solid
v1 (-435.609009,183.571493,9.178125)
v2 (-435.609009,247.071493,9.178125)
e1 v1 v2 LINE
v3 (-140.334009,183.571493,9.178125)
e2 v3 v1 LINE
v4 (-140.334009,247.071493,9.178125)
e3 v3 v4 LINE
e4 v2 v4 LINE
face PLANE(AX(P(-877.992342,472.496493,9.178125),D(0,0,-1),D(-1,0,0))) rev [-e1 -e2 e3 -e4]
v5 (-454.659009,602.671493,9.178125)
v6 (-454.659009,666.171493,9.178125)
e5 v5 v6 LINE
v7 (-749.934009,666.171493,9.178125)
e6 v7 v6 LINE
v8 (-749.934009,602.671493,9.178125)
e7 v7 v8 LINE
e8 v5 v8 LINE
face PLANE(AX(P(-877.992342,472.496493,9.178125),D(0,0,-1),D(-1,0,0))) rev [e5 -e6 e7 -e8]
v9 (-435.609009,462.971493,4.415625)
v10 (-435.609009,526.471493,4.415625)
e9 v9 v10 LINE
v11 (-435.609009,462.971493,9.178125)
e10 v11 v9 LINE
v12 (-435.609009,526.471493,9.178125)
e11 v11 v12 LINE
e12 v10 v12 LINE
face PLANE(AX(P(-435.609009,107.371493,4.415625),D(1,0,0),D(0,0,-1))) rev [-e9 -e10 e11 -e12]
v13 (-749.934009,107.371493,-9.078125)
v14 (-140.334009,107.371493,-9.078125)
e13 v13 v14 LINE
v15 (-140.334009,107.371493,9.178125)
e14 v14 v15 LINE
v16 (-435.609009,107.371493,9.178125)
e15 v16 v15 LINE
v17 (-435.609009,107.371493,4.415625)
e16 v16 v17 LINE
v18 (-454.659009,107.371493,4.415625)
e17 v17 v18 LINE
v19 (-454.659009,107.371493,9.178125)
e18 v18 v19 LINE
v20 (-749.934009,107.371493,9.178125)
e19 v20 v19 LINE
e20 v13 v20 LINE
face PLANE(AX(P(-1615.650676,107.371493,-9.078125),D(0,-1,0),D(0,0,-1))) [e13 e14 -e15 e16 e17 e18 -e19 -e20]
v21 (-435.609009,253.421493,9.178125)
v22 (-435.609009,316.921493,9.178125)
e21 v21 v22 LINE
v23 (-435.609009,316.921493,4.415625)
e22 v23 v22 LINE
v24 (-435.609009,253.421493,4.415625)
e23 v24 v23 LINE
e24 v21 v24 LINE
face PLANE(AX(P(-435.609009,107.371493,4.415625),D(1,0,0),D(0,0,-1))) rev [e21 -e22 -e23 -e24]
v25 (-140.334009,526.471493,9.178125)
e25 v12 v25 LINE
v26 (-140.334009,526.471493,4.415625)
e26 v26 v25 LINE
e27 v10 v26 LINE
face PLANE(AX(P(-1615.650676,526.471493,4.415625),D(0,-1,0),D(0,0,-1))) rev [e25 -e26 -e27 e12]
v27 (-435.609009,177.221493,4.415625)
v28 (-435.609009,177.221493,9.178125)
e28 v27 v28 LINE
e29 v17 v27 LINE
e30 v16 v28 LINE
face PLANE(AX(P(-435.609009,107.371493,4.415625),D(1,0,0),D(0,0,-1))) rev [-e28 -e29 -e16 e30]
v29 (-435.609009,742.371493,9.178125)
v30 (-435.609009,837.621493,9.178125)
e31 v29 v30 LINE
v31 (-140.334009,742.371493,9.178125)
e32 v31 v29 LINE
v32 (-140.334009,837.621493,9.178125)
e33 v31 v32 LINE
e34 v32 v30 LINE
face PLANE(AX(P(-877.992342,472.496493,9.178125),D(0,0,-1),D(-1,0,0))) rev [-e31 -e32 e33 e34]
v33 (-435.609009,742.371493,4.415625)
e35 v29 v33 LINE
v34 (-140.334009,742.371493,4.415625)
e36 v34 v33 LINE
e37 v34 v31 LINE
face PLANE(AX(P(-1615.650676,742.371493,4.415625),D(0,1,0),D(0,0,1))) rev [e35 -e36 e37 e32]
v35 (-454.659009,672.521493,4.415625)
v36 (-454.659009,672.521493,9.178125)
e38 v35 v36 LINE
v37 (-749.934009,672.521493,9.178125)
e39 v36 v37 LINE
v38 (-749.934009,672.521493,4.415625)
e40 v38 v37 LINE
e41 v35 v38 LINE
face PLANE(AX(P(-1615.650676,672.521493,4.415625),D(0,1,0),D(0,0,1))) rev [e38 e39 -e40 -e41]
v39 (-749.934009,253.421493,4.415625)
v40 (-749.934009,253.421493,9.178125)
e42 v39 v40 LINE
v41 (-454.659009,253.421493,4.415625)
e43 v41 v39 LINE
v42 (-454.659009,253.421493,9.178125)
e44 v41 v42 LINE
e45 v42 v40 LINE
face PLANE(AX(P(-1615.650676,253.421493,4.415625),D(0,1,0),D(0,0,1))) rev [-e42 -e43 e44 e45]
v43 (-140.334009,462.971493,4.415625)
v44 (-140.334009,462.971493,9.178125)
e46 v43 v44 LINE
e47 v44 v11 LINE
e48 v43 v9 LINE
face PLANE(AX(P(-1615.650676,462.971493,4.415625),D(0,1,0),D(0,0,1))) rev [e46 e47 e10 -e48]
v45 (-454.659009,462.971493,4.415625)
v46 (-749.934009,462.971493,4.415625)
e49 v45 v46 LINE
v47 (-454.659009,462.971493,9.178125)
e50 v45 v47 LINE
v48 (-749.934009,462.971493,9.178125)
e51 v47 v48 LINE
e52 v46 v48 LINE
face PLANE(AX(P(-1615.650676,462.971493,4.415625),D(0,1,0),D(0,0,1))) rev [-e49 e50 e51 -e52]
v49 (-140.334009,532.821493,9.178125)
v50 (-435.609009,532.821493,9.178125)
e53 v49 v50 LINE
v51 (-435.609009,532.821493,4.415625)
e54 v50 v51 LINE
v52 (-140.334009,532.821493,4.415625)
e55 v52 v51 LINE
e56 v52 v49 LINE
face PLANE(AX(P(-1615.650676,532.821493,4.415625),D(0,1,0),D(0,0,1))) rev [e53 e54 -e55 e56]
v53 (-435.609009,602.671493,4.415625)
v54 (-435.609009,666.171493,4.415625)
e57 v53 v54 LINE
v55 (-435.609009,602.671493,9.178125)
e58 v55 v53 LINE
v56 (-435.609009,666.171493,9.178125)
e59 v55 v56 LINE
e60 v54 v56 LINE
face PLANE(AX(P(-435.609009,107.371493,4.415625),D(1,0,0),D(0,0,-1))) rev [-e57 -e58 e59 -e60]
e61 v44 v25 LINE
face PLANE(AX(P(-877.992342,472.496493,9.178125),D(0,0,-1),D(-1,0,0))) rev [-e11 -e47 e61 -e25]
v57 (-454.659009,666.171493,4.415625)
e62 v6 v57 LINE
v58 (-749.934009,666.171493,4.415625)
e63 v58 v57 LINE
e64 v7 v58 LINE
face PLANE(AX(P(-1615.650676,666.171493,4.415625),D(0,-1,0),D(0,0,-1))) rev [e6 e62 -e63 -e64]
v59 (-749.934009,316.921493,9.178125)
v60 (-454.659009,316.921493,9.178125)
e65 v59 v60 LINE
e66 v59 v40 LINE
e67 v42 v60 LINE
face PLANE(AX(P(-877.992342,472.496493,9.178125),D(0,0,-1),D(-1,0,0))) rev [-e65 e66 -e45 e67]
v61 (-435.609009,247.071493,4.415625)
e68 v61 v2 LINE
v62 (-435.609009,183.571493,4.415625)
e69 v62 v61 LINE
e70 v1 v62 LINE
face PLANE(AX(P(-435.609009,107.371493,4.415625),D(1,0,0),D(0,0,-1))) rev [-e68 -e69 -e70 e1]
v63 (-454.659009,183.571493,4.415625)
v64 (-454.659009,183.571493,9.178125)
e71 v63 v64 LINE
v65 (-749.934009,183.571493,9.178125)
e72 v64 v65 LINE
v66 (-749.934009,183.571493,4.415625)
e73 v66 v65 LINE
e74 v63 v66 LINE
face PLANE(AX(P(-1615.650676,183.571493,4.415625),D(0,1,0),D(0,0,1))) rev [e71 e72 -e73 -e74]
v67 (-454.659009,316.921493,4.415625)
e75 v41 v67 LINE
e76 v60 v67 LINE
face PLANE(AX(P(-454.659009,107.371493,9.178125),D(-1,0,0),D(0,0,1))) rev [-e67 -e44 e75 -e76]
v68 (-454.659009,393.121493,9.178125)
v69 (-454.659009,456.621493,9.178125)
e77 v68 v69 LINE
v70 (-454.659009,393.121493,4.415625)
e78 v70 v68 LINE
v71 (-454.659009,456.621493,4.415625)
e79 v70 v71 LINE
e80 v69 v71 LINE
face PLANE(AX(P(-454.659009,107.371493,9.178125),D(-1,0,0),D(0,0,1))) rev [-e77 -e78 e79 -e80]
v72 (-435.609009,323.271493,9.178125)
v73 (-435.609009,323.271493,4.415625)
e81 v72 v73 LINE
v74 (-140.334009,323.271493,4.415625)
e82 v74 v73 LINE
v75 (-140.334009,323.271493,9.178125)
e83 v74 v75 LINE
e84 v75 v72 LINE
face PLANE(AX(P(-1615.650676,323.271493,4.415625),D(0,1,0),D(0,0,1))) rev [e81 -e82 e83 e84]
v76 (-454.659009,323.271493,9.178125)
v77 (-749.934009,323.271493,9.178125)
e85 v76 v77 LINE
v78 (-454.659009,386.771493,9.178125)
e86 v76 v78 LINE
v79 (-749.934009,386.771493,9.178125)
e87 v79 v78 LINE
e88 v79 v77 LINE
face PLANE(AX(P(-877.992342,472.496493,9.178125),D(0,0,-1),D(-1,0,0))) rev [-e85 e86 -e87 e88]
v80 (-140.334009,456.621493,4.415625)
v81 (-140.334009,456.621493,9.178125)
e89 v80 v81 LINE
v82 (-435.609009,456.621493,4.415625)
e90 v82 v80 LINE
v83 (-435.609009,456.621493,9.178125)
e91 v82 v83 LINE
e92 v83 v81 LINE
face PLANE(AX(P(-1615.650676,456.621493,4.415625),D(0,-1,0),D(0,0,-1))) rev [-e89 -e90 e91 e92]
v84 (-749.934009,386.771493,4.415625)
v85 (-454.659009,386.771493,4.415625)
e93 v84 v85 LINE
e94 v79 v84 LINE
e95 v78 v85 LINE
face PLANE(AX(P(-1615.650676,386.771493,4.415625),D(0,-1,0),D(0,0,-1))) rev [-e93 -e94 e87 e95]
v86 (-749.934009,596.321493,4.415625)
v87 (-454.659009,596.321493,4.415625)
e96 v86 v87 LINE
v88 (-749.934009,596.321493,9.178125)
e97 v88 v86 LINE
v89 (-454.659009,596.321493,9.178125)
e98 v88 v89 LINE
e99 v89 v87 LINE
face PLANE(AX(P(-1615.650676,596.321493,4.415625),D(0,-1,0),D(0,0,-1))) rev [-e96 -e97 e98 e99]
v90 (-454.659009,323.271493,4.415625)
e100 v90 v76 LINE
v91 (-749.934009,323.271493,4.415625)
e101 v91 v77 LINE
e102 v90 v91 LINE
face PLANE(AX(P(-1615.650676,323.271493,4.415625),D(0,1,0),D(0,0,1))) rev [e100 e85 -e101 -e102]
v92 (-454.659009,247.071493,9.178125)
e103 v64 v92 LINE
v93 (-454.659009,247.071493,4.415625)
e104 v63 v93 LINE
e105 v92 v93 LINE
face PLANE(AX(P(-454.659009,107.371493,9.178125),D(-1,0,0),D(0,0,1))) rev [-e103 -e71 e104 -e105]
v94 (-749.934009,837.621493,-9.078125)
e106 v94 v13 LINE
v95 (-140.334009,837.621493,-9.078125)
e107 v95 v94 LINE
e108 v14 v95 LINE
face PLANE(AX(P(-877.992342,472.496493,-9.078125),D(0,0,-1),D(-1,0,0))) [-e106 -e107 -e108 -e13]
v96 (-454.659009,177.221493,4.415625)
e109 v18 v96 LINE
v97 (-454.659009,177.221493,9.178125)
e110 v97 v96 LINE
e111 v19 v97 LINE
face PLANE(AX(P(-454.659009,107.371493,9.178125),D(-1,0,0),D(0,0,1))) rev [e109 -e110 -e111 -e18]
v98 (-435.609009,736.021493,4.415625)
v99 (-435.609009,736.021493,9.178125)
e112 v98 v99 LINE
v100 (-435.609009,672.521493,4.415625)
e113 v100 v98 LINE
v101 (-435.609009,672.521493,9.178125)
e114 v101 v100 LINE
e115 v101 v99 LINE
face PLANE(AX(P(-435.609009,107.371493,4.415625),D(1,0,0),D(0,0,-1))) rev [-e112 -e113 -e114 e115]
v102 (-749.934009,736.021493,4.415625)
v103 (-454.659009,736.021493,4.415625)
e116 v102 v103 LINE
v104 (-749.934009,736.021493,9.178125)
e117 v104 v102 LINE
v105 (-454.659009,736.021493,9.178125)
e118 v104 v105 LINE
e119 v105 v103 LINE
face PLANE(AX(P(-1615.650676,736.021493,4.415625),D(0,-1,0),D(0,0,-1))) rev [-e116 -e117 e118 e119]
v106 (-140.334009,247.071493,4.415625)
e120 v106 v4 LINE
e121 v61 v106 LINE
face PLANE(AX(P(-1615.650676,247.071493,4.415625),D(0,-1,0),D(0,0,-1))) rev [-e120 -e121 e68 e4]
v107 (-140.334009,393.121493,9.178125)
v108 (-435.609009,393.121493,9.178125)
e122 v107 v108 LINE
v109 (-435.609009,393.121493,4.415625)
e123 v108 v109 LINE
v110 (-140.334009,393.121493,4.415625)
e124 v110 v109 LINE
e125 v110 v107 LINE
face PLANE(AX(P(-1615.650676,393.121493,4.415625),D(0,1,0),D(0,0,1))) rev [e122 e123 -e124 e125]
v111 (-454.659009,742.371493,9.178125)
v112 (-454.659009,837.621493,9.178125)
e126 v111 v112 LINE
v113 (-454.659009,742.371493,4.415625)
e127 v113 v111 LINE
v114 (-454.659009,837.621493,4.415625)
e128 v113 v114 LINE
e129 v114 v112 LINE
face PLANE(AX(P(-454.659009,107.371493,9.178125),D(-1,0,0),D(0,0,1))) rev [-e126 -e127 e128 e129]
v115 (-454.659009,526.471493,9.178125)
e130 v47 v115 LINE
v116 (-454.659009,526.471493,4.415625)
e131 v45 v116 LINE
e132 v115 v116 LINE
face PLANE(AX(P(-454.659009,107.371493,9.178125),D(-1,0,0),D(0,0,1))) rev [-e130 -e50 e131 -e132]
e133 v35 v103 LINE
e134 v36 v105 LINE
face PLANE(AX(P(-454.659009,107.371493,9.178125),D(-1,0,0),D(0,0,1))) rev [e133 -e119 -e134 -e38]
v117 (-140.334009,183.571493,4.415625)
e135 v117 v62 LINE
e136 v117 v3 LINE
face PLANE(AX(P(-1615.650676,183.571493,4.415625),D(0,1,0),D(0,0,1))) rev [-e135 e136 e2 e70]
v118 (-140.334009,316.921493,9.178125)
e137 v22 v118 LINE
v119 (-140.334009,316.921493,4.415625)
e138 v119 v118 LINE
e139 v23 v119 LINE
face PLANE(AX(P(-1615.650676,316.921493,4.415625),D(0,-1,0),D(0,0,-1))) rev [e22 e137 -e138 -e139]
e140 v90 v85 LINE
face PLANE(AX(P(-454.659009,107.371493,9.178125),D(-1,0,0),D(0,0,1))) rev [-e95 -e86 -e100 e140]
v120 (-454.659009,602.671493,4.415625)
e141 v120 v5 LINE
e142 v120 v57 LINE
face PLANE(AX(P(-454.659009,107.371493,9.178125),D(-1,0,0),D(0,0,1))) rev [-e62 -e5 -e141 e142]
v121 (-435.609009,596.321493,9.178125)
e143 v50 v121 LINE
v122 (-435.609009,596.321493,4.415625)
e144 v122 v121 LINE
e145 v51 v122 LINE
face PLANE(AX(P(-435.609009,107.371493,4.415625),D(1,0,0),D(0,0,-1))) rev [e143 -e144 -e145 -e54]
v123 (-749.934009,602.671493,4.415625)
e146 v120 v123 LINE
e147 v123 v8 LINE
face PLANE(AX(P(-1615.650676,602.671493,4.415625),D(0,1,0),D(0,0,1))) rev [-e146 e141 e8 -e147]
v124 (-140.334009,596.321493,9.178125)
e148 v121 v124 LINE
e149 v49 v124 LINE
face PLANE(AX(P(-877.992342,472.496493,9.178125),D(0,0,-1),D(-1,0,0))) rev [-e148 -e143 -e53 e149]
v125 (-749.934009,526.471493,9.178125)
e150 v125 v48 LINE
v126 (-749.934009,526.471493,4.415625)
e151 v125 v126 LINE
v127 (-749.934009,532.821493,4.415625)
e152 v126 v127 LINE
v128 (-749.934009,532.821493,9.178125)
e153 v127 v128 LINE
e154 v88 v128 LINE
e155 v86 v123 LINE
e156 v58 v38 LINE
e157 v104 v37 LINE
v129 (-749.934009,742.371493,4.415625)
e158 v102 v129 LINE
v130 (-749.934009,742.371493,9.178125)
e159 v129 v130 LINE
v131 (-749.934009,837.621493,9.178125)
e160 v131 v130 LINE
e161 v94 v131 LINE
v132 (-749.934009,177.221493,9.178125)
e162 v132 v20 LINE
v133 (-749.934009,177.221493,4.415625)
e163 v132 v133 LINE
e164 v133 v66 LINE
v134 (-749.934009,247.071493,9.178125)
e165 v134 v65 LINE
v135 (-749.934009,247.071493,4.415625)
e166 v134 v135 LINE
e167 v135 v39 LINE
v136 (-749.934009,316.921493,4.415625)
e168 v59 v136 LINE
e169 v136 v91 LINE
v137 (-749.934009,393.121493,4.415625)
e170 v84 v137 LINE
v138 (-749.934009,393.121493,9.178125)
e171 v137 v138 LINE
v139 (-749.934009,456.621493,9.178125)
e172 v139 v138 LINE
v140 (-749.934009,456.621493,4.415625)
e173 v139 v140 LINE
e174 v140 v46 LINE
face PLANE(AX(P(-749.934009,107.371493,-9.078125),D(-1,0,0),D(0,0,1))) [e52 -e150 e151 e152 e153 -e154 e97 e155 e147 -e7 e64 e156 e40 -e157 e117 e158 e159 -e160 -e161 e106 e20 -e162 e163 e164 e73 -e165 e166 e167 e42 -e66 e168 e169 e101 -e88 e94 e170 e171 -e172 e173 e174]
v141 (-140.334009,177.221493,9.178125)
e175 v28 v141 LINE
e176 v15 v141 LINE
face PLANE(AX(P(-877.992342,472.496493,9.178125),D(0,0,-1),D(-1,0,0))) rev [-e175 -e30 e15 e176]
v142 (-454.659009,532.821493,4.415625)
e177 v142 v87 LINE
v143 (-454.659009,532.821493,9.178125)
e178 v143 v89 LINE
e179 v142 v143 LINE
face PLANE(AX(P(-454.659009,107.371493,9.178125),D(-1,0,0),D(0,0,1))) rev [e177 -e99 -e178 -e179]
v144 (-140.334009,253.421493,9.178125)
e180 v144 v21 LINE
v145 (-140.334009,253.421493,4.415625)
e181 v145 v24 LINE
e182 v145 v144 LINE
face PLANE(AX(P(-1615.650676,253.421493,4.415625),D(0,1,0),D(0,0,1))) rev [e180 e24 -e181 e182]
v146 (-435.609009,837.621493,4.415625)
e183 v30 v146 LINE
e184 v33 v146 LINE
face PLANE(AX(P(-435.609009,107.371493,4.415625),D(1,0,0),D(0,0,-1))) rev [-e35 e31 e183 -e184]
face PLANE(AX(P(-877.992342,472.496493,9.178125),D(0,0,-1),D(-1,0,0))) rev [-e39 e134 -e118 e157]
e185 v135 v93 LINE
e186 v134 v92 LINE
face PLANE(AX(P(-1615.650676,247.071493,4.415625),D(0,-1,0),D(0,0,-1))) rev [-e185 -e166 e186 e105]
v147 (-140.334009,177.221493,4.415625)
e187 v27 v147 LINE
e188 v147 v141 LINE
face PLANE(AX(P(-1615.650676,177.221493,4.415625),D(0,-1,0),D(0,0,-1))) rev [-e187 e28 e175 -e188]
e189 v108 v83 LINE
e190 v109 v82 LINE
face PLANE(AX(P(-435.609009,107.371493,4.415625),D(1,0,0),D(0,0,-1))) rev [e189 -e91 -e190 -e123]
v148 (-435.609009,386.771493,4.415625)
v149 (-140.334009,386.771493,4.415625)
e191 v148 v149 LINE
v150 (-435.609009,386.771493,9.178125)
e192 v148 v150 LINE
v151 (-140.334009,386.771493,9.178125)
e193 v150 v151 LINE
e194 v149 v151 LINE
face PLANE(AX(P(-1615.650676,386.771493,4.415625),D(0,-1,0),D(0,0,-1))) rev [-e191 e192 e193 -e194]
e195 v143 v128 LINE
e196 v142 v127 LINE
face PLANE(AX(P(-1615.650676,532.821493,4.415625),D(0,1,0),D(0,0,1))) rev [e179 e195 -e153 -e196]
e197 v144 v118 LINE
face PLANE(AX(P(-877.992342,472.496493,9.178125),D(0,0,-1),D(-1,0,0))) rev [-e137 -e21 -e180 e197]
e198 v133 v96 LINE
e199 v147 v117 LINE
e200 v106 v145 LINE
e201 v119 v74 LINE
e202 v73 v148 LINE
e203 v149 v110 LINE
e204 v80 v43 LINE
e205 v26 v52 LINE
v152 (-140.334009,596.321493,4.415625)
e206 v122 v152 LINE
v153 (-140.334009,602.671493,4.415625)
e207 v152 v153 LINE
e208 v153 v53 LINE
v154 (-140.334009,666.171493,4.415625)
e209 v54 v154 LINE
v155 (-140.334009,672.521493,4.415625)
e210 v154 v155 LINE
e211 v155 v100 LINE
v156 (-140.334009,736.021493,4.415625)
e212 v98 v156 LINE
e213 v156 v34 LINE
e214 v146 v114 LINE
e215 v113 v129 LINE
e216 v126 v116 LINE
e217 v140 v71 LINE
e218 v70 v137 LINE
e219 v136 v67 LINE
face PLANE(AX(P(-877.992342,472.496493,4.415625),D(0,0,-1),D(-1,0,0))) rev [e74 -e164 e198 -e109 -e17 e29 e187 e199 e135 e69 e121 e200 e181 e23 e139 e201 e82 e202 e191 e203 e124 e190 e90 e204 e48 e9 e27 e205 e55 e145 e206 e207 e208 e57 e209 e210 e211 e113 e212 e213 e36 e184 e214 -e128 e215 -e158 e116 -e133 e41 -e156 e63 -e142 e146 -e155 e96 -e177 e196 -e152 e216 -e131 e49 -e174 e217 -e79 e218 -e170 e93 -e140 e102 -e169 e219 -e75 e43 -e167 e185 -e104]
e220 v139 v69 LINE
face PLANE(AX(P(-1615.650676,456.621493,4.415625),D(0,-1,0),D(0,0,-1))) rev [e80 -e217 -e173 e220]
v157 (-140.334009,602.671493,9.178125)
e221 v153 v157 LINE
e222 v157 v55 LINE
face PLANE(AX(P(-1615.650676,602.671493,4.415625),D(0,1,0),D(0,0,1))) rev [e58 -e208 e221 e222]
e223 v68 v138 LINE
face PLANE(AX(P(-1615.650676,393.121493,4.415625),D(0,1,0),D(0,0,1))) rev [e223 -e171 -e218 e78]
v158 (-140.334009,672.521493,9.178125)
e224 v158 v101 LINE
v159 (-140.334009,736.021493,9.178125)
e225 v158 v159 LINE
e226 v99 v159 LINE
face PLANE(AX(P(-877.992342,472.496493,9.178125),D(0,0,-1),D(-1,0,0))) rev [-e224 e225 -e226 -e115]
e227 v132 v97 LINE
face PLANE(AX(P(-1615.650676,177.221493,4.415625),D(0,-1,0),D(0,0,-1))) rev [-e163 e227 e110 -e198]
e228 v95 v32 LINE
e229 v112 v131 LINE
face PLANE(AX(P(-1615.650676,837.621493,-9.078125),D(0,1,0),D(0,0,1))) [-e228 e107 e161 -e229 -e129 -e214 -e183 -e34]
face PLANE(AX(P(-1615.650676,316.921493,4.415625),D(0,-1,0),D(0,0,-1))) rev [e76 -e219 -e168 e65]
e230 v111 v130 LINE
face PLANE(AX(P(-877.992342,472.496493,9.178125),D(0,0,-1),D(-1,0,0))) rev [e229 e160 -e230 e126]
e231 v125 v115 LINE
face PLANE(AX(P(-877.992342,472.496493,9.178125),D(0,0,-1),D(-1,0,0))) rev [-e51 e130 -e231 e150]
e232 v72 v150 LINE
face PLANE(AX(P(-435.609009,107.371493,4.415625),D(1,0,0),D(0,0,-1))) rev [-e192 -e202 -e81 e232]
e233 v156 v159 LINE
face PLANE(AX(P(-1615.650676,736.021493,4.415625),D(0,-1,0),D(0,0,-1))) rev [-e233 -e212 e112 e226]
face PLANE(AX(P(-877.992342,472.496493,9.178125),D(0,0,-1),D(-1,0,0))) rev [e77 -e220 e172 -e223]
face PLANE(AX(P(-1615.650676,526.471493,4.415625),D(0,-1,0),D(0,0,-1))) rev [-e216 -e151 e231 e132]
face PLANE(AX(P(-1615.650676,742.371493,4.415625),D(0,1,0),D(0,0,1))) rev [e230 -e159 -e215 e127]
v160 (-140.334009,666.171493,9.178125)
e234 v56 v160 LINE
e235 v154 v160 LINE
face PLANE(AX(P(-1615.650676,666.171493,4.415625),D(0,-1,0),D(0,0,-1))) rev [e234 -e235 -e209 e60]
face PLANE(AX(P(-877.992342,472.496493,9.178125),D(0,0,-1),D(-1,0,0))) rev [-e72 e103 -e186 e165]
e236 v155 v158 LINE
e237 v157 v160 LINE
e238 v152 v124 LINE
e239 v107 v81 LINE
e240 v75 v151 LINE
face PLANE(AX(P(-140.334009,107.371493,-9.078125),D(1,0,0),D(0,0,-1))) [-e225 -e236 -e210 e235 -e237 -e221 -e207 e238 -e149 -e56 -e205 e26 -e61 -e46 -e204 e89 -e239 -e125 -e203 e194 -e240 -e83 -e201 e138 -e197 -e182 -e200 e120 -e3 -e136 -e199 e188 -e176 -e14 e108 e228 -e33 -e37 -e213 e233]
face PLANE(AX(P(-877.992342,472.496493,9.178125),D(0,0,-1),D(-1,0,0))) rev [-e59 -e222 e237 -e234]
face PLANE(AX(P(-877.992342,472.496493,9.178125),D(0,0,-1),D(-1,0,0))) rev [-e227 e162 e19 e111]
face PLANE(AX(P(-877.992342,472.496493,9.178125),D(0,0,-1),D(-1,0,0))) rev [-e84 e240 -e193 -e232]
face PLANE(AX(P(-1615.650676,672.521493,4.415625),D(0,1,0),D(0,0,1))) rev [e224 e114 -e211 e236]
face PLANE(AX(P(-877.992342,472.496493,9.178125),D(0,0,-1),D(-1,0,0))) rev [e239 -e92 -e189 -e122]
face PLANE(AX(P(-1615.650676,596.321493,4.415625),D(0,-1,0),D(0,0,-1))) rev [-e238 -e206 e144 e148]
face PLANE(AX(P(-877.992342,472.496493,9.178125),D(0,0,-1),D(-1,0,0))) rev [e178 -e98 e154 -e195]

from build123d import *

# Parameters (mm, degrees)
PARTSCAB_REFERENCE_START = -1615.650675561
PARTSCAB_REFERENCE_DEPTH = 1475.316666667
SKETCH1_OUTSIDE_W        = 1806.569
SKETCH1_OUTSIDE_H        = 1061.502
SKETCH1_OUTSIDE_W_2      = 609.6
SKETCH1_OUTSIDE_H_2      = 730.25
CUT_EXTRUDE1_DEPTH       = 1820.964329577
SKETCH3_W                = 19.05
SKETCH3_H                = 4.7625
CUT_EXTRUDE3_DEPTH       = 1047.78093132
SKETCH4_W                = 609.6
SKETCH4_H                = 4.7625
BOSS_EXTRUDE1_DEPTH      = 730.25


# Read off the part's stored shape, not the designer's step: PartsCab_Reference
with BuildPart() as part:
    # PartsCab_Reference outline → PartsCab_Reference (new body)
    with BuildSketch(Plane.YZ.offset(PARTSCAB_REFERENCE_START)):
        Polygon((107.371492578, 9.178125), (107.371492578, -9.078125), (177.221492578, -9.078125), (177.221492578, -4.315625), (183.571492578, -4.315625), (183.571492578, -9.078125), (247.071492578, -9.078125), (247.071492578, -4.315625), (253.421492578, -4.315625), (253.421492578, -9.078125), (316.921492578, -9.078125), (316.921492578, -4.315625), (323.271492578, -4.315625), (323.271492578, -9.078125), (386.771492578, -9.078125), (386.771492578, -4.315625), (393.121492578, -4.315625), (393.121492578, -9.078125), (456.621492578, -9.078125), (456.621492578, -4.315625), (462.971492578, -4.315625), (462.971492578, -9.078125), (526.471492578, -9.078125), (526.471492578, -4.315625), (532.821492578, -4.315625), (532.821492578, -9.078125), (596.321492578, -9.078125), (596.321492578, -4.315625), (602.671492578, -4.315625), (602.671492578, -9.078125), (666.171492578, -9.078125), (666.171492578, -4.315625), (672.521492578, -4.315625), (672.521492578, -9.078125), (736.021492578, -9.078125), (736.021492578, -4.315625), (742.371492578, -4.315625), (742.371492578, -9.078125), (837.621492578, -9.078125), (837.621492578, 9.178125), (742.371492578, 9.178125), (742.371492578, 4.415625), (736.021492578, 4.415625), (736.021492578, 9.178125), (672.521492578, 9.178125), (672.521492578, 4.415625), (666.171492578, 4.415625), (666.171492578, 9.178125), (602.671492578, 9.178125), (602.671492578, 4.415625), (596.321492578, 4.415625), (596.321492578, 9.178125), (532.821492578, 9.178125), (532.821492578, 4.415625), (526.471492578, 4.415625), (526.471492578, 9.178125), (462.971492578, 9.178125), (462.971492578, 4.415625), (456.621492578, 4.415625), (456.621492578, 9.178125), (393.121492578, 9.178125), (393.121492578, 4.415625), (386.771492578, 4.415625), (386.771492578, 9.178125), (323.271492578, 9.178125), (323.271492578, 4.415625), (316.921492578, 4.415625), (316.921492578, 9.178125), (253.421492578, 9.178125), (253.421492578, 4.415625), (247.071492578, 4.415625), (247.071492578, 9.178125), (183.571492578, 9.178125), (183.571492578, 4.415625), (177.221492578, 4.415625), (177.221492578, 9.178125), align=None)
    extrude(amount=PARTSCAB_REFERENCE_DEPTH)

    # Sketch1 outside → Cut-Extrude1 (cut, through all)
    with BuildSketch(Plane.XY.offset(9.178125)):
        with Locations((-877.9925, 472.496)):
            Rectangle(SKETCH1_OUTSIDE_W, SKETCH1_OUTSIDE_H)
        with Locations((-445.134008894, 472.496492578)):
            Rectangle(SKETCH1_OUTSIDE_W_2, SKETCH1_OUTSIDE_H_2, mode=Mode.SUBTRACT)
    extrude(amount=-CUT_EXTRUDE1_DEPTH, mode=Mode.SUBTRACT)

    # Sketch3 → Cut-Extrude3 (cut, through all)
    with BuildSketch(Plane(origin=(0, 837.621492578, 0), x_dir=(1, 0, 0), z_dir=(0, 1, 0))):
        with Locations((-445.134008894, -6.796875)):
            Rectangle(SKETCH3_W, SKETCH3_H)
    extrude(amount=-CUT_EXTRUDE3_DEPTH, mode=Mode.SUBTRACT)

    # Sketch4 → Boss-Extrude1 (add)
    with BuildSketch(Plane(origin=(0, 837.621492578, 0), x_dir=(1, 0, 0), z_dir=(0, 1, 0))):
        with Locations((-445.134008894, 6.696875)):
            Rectangle(SKETCH4_W, SKETCH4_H)
    extrude(amount=-BOSS_EXTRUDE1_DEPTH)


solid = part.part
